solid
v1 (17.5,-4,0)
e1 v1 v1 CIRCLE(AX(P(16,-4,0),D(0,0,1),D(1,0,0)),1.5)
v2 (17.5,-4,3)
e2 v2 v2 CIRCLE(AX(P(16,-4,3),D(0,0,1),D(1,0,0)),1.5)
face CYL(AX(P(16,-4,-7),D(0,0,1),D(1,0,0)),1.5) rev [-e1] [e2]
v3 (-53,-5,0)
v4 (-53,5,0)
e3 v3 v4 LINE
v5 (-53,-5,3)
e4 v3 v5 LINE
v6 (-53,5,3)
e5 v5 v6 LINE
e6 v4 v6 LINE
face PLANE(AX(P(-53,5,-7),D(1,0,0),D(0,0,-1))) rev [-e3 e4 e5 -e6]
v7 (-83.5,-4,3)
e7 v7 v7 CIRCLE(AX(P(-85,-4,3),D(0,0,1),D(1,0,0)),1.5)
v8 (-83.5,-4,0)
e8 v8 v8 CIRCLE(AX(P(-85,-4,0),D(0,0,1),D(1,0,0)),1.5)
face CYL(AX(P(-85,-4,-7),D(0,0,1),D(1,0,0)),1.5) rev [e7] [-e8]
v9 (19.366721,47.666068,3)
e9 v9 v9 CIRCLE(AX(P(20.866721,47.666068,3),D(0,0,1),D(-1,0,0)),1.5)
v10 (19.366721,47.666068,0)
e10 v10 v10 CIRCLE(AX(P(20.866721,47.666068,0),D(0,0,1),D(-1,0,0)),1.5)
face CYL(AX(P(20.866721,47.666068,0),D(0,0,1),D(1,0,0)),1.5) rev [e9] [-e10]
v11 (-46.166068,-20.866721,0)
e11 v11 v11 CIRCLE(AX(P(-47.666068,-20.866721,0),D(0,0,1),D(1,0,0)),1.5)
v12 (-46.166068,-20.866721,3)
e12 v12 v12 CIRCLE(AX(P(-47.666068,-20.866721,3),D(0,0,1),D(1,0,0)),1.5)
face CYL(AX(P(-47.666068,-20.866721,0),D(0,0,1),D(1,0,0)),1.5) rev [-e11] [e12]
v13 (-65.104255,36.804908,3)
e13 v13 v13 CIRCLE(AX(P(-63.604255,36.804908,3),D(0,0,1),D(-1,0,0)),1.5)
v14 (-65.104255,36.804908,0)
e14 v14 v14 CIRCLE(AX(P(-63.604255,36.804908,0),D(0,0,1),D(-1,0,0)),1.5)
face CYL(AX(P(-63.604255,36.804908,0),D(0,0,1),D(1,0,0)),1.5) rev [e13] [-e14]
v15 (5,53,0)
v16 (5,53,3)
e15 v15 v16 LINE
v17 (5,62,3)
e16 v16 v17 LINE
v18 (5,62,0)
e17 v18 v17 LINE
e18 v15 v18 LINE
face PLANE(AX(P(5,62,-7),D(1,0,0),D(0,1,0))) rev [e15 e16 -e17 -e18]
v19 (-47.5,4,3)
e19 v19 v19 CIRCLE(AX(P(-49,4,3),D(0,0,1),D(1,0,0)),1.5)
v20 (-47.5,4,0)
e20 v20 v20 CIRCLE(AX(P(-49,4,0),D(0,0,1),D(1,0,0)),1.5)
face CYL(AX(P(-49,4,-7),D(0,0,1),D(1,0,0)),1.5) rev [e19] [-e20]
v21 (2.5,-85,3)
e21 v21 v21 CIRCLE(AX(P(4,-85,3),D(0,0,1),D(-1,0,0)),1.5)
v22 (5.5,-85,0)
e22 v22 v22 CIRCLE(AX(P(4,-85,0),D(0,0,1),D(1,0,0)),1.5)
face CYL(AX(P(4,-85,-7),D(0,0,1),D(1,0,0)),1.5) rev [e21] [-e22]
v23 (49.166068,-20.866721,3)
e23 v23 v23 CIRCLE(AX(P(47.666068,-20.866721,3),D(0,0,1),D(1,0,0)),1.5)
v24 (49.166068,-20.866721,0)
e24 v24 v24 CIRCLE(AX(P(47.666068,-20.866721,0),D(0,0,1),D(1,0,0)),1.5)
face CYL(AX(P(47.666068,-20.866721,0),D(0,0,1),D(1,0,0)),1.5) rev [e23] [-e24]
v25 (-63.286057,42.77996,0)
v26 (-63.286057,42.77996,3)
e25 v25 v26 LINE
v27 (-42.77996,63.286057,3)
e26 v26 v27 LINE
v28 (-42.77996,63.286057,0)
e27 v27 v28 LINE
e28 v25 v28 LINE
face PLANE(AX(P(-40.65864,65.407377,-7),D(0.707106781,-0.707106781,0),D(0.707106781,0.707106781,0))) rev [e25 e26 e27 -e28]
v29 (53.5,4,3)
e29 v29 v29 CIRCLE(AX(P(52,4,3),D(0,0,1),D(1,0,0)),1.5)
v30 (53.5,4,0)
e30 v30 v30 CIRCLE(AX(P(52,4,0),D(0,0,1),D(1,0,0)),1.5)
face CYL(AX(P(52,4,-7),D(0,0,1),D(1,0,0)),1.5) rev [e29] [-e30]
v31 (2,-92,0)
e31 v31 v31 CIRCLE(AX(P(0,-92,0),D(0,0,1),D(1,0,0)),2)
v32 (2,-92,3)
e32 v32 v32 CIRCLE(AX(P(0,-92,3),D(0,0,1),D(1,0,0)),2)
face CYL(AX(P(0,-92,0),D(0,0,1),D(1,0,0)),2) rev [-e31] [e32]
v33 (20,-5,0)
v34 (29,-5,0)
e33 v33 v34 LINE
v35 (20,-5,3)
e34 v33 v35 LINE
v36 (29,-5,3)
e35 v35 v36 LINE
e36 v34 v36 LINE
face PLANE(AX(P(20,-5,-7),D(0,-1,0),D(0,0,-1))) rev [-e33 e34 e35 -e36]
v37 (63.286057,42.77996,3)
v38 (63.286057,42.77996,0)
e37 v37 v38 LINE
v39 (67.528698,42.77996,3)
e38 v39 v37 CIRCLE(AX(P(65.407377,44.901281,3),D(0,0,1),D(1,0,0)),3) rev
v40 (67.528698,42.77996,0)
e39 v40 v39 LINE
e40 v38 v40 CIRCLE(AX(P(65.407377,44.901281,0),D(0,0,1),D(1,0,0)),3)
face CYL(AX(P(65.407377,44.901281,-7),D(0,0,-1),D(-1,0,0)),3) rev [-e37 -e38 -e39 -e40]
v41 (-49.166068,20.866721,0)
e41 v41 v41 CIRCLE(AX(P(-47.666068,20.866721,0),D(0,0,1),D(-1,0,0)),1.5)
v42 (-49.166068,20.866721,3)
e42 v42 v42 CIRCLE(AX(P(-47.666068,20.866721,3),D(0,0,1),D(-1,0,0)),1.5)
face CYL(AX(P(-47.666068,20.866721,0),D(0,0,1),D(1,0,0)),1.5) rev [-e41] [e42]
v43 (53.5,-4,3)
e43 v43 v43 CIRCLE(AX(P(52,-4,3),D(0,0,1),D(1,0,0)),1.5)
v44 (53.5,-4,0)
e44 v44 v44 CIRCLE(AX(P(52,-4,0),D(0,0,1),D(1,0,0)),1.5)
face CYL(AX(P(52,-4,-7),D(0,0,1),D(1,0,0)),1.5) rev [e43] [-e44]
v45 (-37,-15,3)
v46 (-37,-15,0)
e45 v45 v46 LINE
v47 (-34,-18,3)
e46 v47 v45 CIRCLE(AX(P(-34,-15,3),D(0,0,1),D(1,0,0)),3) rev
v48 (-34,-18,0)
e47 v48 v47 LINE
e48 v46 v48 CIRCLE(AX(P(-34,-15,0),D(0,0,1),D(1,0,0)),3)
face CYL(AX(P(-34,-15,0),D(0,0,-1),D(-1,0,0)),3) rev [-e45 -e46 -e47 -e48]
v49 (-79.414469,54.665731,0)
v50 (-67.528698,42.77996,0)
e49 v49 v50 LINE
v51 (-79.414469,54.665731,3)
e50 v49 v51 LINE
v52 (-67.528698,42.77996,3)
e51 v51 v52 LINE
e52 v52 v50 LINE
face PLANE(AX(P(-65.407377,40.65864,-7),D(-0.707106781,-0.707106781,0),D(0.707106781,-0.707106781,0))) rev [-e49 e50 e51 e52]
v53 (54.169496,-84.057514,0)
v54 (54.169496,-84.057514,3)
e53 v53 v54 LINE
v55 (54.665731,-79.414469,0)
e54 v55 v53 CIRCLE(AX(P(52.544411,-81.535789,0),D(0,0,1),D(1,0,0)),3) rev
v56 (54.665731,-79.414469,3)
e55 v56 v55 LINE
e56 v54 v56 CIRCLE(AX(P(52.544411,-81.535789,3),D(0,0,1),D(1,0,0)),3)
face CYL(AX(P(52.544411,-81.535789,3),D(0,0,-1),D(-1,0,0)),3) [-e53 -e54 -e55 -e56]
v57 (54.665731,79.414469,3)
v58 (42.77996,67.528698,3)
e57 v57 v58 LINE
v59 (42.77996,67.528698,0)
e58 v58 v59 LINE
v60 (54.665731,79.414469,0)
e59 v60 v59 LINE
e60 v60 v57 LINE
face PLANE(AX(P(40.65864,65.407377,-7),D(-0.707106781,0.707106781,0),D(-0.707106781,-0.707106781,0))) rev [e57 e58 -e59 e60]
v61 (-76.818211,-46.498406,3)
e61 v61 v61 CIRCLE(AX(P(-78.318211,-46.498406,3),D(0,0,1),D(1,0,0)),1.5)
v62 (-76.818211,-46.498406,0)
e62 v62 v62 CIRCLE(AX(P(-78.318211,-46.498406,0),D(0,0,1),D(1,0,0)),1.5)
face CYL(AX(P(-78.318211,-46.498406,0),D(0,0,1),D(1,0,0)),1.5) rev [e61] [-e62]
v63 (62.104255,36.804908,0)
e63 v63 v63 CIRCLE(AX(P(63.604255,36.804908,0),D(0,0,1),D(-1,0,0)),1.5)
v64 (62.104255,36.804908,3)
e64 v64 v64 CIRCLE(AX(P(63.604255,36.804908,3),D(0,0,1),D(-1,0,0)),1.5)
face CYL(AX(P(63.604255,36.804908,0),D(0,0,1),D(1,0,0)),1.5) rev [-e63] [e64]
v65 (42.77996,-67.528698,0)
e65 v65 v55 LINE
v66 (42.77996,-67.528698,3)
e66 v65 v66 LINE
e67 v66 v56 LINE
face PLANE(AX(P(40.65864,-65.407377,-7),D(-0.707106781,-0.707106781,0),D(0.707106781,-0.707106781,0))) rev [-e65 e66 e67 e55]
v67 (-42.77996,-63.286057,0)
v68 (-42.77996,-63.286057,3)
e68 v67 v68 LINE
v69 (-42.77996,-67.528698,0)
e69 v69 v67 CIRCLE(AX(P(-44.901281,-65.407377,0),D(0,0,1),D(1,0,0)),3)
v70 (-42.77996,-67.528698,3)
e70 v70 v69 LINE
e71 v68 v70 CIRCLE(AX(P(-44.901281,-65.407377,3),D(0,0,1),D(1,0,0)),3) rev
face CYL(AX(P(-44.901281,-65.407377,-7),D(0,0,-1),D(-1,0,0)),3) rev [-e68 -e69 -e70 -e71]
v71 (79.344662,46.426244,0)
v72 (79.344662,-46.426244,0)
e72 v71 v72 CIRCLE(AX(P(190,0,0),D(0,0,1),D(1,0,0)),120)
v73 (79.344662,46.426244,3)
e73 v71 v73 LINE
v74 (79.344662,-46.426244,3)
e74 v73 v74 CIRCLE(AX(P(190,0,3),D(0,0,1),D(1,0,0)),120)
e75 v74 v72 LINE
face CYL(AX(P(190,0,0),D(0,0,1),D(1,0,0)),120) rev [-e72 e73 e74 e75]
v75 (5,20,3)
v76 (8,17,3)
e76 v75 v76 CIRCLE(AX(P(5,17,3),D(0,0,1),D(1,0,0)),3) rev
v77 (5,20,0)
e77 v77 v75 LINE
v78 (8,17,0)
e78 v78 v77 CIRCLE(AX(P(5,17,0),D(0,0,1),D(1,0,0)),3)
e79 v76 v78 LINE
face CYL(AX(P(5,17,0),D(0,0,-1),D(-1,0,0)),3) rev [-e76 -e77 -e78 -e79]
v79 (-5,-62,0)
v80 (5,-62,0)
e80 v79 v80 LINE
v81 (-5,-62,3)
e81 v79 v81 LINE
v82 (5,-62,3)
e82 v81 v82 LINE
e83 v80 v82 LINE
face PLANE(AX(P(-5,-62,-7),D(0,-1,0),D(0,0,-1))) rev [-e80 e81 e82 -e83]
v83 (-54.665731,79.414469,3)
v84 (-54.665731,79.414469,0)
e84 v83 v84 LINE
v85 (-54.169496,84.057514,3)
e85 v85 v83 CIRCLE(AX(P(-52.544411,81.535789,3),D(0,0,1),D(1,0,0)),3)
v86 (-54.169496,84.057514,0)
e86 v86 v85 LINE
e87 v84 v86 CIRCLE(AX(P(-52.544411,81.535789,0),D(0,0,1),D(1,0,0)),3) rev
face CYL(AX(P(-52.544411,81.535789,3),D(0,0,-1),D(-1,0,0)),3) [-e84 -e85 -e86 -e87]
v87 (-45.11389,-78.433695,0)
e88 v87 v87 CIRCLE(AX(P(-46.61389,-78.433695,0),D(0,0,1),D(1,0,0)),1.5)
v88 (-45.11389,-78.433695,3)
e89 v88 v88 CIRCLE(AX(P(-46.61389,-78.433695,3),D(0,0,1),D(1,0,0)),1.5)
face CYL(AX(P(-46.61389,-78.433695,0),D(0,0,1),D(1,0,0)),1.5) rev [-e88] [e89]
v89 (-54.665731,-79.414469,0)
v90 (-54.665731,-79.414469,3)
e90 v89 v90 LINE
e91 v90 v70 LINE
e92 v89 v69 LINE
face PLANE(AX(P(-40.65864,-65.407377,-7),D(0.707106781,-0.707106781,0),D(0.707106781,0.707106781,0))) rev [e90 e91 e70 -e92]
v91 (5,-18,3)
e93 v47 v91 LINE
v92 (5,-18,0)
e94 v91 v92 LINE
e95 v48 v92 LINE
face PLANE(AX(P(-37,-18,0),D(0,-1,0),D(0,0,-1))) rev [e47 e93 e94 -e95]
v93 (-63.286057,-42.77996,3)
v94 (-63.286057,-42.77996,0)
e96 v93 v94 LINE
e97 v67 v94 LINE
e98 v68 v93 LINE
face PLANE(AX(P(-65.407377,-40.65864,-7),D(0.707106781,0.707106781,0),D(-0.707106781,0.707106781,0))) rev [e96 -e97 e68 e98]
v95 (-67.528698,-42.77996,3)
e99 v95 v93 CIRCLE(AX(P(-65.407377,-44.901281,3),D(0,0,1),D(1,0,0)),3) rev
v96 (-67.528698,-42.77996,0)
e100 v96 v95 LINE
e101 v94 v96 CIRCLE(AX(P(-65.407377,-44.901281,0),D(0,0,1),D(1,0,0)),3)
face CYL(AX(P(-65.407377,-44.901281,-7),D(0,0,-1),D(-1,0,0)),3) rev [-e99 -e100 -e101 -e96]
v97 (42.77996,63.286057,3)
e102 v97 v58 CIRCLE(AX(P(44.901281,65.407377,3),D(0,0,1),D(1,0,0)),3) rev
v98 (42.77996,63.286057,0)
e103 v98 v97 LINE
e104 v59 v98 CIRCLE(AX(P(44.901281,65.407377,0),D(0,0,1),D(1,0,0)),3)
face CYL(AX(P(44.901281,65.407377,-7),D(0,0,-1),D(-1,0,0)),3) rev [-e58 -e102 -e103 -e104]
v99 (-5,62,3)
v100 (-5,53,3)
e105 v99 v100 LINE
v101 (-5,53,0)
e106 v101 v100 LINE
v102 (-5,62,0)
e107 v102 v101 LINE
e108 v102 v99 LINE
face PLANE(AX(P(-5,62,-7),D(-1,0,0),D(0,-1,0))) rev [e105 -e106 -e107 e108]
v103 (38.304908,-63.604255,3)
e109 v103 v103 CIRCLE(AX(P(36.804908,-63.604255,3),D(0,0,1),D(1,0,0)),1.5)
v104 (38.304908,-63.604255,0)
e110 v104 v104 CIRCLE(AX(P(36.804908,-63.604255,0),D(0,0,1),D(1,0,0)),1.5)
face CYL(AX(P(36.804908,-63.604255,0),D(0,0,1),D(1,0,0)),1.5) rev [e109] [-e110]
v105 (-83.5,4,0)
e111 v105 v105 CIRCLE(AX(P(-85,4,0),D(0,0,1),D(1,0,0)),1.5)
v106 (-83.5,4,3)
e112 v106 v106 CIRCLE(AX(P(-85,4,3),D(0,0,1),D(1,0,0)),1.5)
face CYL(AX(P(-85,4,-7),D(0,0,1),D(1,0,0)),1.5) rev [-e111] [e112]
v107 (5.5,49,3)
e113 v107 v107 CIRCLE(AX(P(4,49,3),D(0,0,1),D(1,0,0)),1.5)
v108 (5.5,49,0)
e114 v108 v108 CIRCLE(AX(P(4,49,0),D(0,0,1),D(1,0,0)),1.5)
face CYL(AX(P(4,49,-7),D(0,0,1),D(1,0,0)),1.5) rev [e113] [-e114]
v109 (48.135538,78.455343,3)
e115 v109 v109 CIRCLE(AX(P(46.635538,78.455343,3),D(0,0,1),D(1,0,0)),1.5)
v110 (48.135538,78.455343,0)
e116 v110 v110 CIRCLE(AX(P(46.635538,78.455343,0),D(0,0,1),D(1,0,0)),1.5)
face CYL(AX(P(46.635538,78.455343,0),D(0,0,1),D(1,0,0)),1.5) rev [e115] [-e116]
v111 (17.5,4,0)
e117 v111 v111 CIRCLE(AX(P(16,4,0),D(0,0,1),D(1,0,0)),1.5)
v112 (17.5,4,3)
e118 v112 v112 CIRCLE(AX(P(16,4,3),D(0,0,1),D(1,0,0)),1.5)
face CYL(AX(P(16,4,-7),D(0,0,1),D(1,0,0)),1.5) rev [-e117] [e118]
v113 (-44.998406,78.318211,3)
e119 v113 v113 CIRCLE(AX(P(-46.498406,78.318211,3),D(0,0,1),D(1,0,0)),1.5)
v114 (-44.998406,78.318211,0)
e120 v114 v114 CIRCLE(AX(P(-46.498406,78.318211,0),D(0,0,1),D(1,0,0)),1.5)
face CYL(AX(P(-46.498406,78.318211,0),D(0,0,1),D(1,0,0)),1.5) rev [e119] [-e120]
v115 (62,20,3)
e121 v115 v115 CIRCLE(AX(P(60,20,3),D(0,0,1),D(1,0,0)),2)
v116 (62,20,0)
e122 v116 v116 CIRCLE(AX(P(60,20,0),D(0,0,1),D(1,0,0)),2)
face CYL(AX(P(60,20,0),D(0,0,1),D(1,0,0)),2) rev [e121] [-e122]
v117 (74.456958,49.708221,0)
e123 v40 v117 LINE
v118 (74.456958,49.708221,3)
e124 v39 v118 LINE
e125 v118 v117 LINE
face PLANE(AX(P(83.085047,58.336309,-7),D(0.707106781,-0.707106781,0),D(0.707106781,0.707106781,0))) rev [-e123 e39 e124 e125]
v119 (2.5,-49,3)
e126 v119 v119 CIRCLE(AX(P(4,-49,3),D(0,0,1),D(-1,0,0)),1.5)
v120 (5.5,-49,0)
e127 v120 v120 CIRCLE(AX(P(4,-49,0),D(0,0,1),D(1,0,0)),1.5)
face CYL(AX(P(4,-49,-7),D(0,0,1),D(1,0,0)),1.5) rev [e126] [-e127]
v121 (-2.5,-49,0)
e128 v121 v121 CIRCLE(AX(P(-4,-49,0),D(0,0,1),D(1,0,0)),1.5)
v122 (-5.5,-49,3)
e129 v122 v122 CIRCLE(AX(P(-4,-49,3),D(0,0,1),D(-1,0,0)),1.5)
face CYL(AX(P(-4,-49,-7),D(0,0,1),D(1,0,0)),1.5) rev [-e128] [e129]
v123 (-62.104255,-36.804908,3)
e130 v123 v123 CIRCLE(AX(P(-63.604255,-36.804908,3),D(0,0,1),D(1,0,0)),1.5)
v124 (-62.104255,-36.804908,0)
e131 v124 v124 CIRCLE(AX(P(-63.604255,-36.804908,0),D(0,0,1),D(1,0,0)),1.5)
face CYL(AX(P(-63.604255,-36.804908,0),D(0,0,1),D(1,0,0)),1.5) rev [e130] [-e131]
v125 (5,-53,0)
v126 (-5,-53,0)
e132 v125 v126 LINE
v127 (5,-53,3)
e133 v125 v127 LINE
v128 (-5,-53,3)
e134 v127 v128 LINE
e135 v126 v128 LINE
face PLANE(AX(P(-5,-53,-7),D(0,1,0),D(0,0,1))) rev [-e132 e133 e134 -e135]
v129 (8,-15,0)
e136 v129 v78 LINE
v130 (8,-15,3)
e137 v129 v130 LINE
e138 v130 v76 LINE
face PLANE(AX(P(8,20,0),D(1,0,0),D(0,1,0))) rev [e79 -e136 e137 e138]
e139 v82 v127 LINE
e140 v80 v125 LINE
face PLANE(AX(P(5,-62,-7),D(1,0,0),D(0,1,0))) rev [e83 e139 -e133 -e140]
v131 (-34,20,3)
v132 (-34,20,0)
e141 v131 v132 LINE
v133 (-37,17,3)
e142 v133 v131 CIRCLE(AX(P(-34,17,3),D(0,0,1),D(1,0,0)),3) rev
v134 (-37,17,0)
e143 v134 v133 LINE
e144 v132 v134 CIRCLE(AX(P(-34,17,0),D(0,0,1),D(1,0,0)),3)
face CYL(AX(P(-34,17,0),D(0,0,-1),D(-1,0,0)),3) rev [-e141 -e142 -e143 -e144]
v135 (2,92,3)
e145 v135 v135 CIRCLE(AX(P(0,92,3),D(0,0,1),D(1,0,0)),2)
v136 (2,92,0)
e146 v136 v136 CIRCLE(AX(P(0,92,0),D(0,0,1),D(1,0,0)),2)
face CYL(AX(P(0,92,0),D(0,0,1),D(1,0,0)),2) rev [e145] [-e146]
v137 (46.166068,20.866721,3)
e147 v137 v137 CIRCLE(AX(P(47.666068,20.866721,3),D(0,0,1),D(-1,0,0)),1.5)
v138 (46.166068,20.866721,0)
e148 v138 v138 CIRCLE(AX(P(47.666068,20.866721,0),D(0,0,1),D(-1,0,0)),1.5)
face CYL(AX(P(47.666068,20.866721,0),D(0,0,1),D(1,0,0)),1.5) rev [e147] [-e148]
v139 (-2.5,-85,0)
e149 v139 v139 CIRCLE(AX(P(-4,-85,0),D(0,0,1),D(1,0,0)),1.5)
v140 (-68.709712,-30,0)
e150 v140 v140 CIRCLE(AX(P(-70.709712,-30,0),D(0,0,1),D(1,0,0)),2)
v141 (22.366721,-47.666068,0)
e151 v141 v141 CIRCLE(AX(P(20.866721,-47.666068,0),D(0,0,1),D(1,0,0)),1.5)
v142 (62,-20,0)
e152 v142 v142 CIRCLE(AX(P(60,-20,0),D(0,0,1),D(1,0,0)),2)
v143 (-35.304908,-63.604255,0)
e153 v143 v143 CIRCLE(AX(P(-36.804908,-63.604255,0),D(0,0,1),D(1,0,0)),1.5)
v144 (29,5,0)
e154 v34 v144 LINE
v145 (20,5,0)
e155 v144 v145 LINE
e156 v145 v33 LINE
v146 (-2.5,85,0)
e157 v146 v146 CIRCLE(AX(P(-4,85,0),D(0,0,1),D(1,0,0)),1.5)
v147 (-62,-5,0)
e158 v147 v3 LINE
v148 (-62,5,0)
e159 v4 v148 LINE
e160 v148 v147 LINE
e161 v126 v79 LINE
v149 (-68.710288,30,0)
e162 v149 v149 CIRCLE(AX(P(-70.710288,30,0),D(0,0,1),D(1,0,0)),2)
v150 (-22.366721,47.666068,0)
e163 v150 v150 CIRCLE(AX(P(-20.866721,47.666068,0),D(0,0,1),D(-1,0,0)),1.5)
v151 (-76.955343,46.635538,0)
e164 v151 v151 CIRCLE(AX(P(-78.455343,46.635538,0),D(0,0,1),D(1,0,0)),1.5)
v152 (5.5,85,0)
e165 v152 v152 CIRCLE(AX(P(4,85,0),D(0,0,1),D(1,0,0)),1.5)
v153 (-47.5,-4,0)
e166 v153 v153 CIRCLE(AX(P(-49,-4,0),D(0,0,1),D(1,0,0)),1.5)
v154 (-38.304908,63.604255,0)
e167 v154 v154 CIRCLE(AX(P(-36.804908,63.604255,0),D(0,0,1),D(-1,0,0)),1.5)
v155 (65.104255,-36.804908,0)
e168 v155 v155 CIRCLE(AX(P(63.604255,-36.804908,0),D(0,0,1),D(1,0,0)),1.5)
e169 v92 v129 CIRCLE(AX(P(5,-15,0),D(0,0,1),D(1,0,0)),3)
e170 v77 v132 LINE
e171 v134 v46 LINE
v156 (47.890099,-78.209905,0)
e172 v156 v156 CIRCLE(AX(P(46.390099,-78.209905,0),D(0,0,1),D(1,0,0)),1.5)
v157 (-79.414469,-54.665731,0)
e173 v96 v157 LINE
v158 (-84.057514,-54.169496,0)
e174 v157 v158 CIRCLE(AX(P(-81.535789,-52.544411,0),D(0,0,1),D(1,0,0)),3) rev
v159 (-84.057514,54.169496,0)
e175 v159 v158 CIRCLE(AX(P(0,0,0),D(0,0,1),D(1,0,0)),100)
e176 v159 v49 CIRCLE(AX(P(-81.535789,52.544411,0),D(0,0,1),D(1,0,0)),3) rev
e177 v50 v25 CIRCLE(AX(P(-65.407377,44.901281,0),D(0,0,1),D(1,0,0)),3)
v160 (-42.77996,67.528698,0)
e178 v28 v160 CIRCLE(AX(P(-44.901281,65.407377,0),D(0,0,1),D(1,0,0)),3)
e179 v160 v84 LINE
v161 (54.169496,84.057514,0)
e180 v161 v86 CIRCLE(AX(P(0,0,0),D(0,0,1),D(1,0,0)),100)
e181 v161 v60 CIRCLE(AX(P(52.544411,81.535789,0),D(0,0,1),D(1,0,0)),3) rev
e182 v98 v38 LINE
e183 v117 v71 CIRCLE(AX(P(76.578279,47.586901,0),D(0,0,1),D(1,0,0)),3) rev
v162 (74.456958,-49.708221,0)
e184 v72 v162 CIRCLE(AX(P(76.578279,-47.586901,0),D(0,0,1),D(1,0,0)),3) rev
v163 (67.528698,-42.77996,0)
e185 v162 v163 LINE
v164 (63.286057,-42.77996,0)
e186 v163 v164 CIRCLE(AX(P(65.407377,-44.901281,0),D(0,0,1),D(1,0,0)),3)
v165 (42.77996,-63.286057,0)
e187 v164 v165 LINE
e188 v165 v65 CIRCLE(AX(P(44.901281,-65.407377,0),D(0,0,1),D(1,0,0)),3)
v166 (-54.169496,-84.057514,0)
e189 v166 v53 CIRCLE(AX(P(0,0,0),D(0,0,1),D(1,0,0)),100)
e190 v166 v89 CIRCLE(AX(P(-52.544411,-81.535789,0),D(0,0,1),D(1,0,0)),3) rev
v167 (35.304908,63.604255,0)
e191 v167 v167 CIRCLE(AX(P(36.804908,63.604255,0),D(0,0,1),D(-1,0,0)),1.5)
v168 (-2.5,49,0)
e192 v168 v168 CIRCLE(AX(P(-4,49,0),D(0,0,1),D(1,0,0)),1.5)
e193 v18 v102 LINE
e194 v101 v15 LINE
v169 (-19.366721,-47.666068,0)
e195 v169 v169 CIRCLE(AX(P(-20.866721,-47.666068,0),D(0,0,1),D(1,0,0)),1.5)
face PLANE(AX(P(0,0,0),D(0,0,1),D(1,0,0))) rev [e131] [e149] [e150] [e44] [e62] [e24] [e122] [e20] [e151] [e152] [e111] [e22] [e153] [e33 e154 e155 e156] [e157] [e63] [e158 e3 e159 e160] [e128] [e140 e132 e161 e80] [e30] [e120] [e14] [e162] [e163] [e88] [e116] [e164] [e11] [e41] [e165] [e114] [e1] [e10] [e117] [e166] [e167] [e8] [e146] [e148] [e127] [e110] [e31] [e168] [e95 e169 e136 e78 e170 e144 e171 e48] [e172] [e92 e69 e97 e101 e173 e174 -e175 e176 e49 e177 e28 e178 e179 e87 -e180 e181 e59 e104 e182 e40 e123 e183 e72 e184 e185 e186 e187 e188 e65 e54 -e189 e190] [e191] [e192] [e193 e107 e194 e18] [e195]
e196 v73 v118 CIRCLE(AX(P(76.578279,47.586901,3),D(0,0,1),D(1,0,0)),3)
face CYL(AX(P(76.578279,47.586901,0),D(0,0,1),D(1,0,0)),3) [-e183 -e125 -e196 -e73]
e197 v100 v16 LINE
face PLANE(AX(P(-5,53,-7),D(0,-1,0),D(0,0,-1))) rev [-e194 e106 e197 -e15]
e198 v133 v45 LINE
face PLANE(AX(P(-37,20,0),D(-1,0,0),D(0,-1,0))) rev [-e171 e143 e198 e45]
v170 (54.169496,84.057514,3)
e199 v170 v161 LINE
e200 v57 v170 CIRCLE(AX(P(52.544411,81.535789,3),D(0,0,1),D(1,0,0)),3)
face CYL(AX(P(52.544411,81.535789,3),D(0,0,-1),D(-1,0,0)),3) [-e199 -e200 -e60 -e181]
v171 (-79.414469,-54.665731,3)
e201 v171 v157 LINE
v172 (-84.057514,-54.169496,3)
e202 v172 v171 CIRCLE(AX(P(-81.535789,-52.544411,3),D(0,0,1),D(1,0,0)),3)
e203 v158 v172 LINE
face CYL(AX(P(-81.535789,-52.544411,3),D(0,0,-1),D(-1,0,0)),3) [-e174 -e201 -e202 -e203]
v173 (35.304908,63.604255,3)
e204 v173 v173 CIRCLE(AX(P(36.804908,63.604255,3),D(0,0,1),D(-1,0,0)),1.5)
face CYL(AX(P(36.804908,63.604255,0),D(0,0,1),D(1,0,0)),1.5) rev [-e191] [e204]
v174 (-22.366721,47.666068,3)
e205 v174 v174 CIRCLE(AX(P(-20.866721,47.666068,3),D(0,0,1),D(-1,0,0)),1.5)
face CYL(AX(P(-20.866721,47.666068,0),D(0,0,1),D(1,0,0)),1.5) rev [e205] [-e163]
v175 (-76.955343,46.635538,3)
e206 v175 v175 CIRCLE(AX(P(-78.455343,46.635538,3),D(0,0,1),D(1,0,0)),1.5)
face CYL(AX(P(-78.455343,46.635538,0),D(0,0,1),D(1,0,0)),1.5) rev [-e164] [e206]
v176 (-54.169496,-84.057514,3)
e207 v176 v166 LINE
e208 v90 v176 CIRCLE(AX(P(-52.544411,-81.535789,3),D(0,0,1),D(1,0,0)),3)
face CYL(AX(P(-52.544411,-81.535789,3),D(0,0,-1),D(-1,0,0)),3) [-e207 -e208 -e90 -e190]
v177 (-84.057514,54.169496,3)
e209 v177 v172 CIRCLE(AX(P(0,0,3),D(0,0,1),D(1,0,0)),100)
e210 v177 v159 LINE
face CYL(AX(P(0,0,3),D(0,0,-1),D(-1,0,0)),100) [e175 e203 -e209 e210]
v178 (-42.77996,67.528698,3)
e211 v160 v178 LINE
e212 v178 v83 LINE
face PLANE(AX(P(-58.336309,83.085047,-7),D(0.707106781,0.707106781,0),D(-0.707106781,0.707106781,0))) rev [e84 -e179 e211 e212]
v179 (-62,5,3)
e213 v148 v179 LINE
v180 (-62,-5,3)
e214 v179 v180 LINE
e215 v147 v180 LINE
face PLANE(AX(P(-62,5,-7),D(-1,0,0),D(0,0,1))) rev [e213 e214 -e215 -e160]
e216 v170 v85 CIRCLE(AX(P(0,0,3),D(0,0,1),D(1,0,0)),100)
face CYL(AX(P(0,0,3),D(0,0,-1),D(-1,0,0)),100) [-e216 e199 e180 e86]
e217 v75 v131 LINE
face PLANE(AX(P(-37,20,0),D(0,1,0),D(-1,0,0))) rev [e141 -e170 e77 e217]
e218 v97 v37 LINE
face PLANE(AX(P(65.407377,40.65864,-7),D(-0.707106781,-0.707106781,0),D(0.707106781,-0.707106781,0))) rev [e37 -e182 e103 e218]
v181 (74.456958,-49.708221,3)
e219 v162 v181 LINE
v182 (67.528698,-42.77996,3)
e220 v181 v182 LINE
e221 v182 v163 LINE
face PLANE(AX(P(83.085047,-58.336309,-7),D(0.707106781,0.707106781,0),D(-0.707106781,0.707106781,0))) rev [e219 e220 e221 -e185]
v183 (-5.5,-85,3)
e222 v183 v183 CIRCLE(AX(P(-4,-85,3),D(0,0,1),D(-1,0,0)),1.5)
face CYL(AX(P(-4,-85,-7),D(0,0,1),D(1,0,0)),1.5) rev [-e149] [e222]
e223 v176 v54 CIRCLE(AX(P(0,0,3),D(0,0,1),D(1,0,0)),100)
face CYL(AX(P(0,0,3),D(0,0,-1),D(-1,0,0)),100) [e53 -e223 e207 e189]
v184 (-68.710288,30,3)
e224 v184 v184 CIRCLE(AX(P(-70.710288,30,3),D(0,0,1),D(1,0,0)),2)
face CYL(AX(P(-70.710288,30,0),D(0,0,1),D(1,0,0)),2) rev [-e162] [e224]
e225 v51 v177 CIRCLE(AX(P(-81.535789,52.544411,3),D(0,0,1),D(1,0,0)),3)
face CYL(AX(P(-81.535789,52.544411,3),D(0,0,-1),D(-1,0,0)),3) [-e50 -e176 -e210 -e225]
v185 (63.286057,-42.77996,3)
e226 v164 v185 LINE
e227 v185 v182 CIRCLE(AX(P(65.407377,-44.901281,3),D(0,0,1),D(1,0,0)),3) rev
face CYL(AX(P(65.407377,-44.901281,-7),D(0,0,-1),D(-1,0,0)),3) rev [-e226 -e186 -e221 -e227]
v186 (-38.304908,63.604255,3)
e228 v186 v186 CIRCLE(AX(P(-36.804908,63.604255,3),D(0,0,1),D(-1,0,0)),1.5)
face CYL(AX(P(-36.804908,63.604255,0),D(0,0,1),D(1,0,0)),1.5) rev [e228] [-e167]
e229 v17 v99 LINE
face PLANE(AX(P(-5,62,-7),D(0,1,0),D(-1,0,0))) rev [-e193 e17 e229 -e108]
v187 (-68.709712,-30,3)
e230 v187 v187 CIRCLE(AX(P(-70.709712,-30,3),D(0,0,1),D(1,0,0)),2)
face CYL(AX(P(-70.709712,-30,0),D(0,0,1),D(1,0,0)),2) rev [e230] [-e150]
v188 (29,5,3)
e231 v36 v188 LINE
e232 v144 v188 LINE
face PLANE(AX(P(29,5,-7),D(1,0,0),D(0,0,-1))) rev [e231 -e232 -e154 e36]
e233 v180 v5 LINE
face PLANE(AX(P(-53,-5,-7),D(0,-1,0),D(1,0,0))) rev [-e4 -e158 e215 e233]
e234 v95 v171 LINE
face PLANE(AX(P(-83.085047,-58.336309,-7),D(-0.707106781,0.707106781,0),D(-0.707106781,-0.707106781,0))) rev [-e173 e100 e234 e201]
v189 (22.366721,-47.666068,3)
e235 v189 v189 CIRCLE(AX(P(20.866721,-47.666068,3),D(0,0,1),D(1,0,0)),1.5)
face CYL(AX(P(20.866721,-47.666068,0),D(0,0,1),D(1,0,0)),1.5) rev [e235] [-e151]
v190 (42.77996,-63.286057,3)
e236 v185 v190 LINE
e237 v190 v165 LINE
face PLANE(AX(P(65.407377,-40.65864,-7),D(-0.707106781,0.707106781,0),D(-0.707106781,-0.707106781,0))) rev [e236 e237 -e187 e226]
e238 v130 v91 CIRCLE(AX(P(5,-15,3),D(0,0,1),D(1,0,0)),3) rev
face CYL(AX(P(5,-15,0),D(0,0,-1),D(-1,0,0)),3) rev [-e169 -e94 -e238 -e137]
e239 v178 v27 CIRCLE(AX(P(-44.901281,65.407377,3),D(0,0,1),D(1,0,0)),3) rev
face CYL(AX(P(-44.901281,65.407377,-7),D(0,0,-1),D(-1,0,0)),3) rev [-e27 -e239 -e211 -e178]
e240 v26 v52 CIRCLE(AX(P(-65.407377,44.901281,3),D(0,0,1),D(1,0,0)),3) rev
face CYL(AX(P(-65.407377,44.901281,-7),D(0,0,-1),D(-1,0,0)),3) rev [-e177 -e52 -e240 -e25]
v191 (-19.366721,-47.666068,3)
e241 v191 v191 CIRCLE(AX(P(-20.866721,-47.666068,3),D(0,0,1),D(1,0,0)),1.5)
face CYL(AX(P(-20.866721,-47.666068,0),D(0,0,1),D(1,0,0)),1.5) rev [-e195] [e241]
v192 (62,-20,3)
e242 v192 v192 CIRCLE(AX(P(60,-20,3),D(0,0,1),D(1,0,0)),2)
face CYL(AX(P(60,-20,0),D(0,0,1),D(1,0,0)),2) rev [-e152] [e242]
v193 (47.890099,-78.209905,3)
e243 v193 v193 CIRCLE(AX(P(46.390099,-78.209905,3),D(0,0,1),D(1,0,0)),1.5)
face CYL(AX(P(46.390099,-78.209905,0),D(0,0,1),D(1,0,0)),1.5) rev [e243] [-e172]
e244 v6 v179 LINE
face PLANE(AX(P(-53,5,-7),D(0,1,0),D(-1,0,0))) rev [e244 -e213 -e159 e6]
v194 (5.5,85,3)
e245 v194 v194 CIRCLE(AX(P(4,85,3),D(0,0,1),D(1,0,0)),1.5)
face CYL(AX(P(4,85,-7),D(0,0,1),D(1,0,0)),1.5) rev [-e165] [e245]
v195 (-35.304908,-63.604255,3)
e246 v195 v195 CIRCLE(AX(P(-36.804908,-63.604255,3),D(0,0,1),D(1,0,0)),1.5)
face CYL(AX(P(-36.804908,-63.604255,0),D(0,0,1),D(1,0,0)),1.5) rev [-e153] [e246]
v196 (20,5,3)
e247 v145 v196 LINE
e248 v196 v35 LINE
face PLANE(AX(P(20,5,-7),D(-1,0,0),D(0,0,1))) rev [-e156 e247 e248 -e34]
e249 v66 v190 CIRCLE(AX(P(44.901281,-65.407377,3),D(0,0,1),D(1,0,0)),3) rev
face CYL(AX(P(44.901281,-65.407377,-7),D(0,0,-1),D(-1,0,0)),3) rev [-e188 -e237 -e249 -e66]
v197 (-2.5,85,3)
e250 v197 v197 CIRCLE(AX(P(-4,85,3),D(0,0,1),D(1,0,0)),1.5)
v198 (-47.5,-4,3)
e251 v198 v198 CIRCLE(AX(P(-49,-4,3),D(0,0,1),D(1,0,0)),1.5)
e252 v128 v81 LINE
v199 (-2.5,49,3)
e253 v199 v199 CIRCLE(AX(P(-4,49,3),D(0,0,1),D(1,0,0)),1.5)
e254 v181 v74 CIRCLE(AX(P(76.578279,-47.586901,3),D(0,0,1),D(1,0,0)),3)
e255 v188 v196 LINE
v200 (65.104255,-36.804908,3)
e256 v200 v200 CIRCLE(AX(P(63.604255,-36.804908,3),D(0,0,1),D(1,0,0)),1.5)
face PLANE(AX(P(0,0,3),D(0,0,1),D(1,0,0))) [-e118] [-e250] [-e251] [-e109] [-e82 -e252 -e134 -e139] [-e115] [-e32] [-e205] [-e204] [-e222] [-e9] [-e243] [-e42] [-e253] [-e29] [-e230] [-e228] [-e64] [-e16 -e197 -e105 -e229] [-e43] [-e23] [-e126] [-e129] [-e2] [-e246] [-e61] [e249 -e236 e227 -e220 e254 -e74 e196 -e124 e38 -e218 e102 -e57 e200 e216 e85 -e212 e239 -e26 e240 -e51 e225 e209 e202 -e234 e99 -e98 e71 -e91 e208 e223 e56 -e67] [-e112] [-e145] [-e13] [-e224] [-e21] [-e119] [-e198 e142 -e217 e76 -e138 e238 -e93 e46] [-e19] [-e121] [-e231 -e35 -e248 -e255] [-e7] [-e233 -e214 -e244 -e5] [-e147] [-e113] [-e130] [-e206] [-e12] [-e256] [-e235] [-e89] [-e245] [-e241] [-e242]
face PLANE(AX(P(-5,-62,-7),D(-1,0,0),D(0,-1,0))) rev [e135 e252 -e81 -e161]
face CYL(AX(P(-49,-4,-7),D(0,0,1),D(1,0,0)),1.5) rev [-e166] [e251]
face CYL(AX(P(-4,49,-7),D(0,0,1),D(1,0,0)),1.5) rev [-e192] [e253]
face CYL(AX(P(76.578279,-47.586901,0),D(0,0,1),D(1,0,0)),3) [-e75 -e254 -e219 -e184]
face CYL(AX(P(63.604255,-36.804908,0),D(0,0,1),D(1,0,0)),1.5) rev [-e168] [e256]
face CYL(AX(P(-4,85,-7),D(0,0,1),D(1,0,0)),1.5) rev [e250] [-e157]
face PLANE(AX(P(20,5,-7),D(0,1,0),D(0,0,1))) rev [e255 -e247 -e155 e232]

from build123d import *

# Parameters (mm, degrees)
CROQUIS1_R              = 100
SALIENTE_EXTRUIR1_DEPTH = 3
CROQUIS3_R              = 120
CORTAR_EXTRUIR1_DEPTH   = 3
CORTAR_EXTRUIR6_DEPTH   = 10
CROQUIS12_R             = 1.5
CORTAR_EXTRUIR7_DEPTH   = 142.453172464
CROQUIS9_R              = 1.5
CROQUIS9_W              = 9
CROQUIS9_H              = 10
CROQUIS9_W_2            = 10
CROQUIS9_H_2            = 9
CORTAR_EXTRUIR5_DEPTH   = 10
CROQUIS13_R             = 2
CROQUIS13_W             = 45
CROQUIS13_H             = 38
CORTAR_EXTRUIR8_DEPTH   = 142.453172464
REDONDEO2_R             = 3
REDONDEO3_R             = 3
CROQUIS14_R             = 1.5
CORTAR_EXTRUIR9_DEPTH   = 142.453172607


with BuildPart() as part:
    # Croquis1 → Saliente-Extruir1 (new body)
    with BuildSketch(Plane.XY):
        Circle(CROQUIS1_R)
    extrude(amount=SALIENTE_EXTRUIR1_DEPTH)

    # Croquis3 → Cortar-Extruir1 (cut)
    with BuildSketch(Plane.XY.offset(3)):
        with Locations((190, 0)):
            Circle(CROQUIS3_R)
    extrude(amount=-CORTAR_EXTRUIR1_DEPTH, mode=Mode.SUBTRACT)

    # Croquis5 → Cortar-Extruir6 (cut)
    with BuildSketch(Plane.XY.offset(3)):
        Polygon((-58.336309448, -83.085046789), (-83.085046789, -58.336309448), (-65.40737726, -40.658639918), (-40.658639918, -65.40737726), align=None)
        Polygon((-83.085046789, 58.336309448), (-58.336309448, 83.085046789), (-40.658639918, 65.40737726), (-65.40737726, 40.658639918), align=None)
        Polygon((58.336309448, -83.085046789), (83.085046789, -58.336309448), (65.40737726, -40.658639918), (40.658639918, -65.40737726), align=None)
        Polygon((58.336309448, 83.085046789), (83.085046789, 58.336309448), (65.40737726, 40.658639918), (40.658639918, 65.40737726), align=None)
    extrude(amount=-CORTAR_EXTRUIR6_DEPTH, mode=Mode.SUBTRACT)

    # Croquis12 → Cortar-Extruir7 (cut, through all)
    with BuildSketch(Plane.XY.offset(3)):
        with Locations((-63.604254904, -36.804908024)):
            Circle(CROQUIS12_R)
        with Locations((-36.804907897, -63.604255031)):
            Circle(CROQUIS12_R)
        with Locations((-47.666068056, -20.866721176)):
            Circle(CROQUIS12_R)
        with Locations((-20.866721049, -47.666068183)):
            Circle(CROQUIS12_R)
        with Locations(Location((47.666068183, 20.866721049, 0), (0, 0, 180))):
            Circle(CROQUIS12_R)
        with Locations(Location((20.866721176, 47.666068056, 0), (0, 0, 180))):
            Circle(CROQUIS12_R)
        with Locations(Location((63.604255031, 36.804907897, 0), (0, 0, 180))):
            Circle(CROQUIS12_R)
        with Locations(Location((36.804908024, 63.604254904, 0), (0, 0, 180))):
            Circle(CROQUIS12_R)
        with Locations((20.866721325, -47.666067908)):
            Circle(CROQUIS12_R)
        with Locations((47.666068332, -20.866720901)):
            Circle(CROQUIS12_R)
        with Locations((63.60425518, -36.804907749)):
            Circle(CROQUIS12_R)
        with Locations((36.804908173, -63.604254756)):
            Circle(CROQUIS12_R)
        with Locations(Location((-63.604254756, 36.804908173, 0), (0, 0, 180))):
            Circle(CROQUIS12_R)
        with Locations(Location((-36.804907749, 63.60425518, 0), (0, 0, 180))):
            Circle(CROQUIS12_R)
        with Locations(Location((-20.866720901, 47.666068332, 0), (0, 0, 180))):
            Circle(CROQUIS12_R)
        with Locations(Location((-47.666067908, 20.866721325, 0), (0, 0, 180))):
            Circle(CROQUIS12_R)
    extrude(amount=-CORTAR_EXTRUIR7_DEPTH, mode=Mode.SUBTRACT)

    # Croquis9 → Cortar-Extruir5 (cut)
    with BuildSketch(Plane.XY.offset(3)):
        with Locations((52, -4)):
            Circle(CROQUIS9_R)
        with Locations((16, 4)):
            Circle(CROQUIS9_R)
        with Locations((52, 4)):
            Circle(CROQUIS9_R)
        with Locations((16, -4)):
            Circle(CROQUIS9_R)
        with Locations((-85, 4)):
            Circle(CROQUIS9_R)
        with Locations((-85, -4)):
            Circle(CROQUIS9_R)
        with Locations((-49, 4)):
            Circle(CROQUIS9_R)
        with Locations((-49, -4)):
            Circle(CROQUIS9_R)
        with Locations((-4, 85)):
            Circle(CROQUIS9_R)
        with Locations((4, 85)):
            Circle(CROQUIS9_R)
        with Locations((-4, 49)):
            Circle(CROQUIS9_R)
        with Locations((4, 49)):
            Circle(CROQUIS9_R)
        with Locations((-4, -49)):
            Circle(CROQUIS9_R)
        with Locations((4, -49)):
            Circle(CROQUIS9_R)
        with Locations((4, -85)):
            Circle(CROQUIS9_R)
        with Locations((-4, -85)):
            Circle(CROQUIS9_R)
        with Locations((24.5, 0)):
            Rectangle(CROQUIS9_W, CROQUIS9_H)
        with Locations((0, -57.5)):
            Rectangle(CROQUIS9_W_2, CROQUIS9_H_2)
        with Locations((-57.5, 0)):
            Rectangle(CROQUIS9_W, CROQUIS9_H)
        with Locations((0, 57.5)):
            Rectangle(CROQUIS9_W_2, CROQUIS9_H_2)
    extrude(amount=-CORTAR_EXTRUIR5_DEPTH, mode=Mode.SUBTRACT)

    # Croquis13 → Cortar-Extruir8 (cut, through all)
    with BuildSketch(Plane.XY.offset(3)):
        with Locations((-70.710287698, 30)):
            Circle(CROQUIS13_R)
        with Locations((-70.709712289, -30)):
            Circle(CROQUIS13_R)
        with Locations((0, -92)):
            Circle(CROQUIS13_R)
        with Locations((0, 92)):
            Circle(CROQUIS13_R)
        with Locations((60, -20)):
            Circle(CROQUIS13_R)
        with Locations((60, 20)):
            Circle(CROQUIS13_R)
        with Locations((-14.5, 1)):
            Rectangle(CROQUIS13_W, CROQUIS13_H)
    extrude(amount=-CORTAR_EXTRUIR8_DEPTH, mode=Mode.SUBTRACT)

    # Redondeo2
    # the kernel refuses this fillet: 3 mm, written as the material it adds along each edge
    with BuildSketch(Plane(origin=(-37, -18, 3), x_dir=(0, 1, 0), z_dir=(0, 0, -1)), Plane(origin=(8, 20, 3), x_dir=(0, -1, 0), z_dir=(0, 0, -1)), Plane(origin=(8, -18, 3), x_dir=(-1, 0, 0), z_dir=(0, 0, -1)), Plane(origin=(40.658639918, -65.40737726, 3), x_dir=(0.7071067811865925, 0.7071067811865025, 0), z_dir=(0, 0, -1)), Plane(origin=(65.40737726, -40.658639918, 3), x_dir=(0.7071067811865014, -0.7071067811865938, 0), z_dir=(0, 0, -1)), Plane(origin=(-40.658639918, -65.40737726, 3), x_dir=(-0.7071067811865688, -0.7071067811865261, 0), z_dir=(0, 0, -1)), Plane(origin=(-65.40737726, -40.658639918, 3), x_dir=(0.7071067811865263, -0.7071067811865689, 0), z_dir=(0, 0, -1))) as redondeo2_piece_1:
        with BuildLine():
            CenterArc((REDONDEO2_R, REDONDEO2_R), REDONDEO2_R, 180, 90)
            Line((0, REDONDEO2_R), (0, 0))
            Line((0, 0), (REDONDEO2_R, 0))
        make_face()
    extrude(amount=3)
    with BuildSketch(Plane(origin=(-37, 20, 3), x_dir=(0, -1, 0), z_dir=(0, 0, -1)), Plane(origin=(-40.658639918, 65.40737726, 3), x_dir=(-0.7071067811865013, 0.7071067811865936, 0), z_dir=(0, 0, -1)), Plane(origin=(-65.40737726, 40.658639918, 3), x_dir=(0.707106781186595, 0.7071067811865002, 0), z_dir=(0, 0, -1)), Plane(origin=(40.658639918, 65.40737726, 3), x_dir=(0.707106781186525, -0.70710678118657, 0), z_dir=(0, 0, -1)), Plane(origin=(65.40737726, 40.658639918, 3), x_dir=(0.7071067811865688, 0.7071067811865261, 0), z_dir=(0, 0, -1))) as redondeo2_piece_2:
        with BuildLine():
            CenterArc((REDONDEO2_R, -REDONDEO2_R), REDONDEO2_R, 90, 90)
            Line((0, -REDONDEO2_R), (0, 0))
            Line((0, 0), (REDONDEO2_R, 0))
        make_face()
    extrude(amount=3)
    # the kernel refuses this fillet: 3 mm, written as the material it takes off along each edge
    with BuildSketch(Plane(origin=(-81.993870249, 57.245132907, 12.259512252), x_dir=(0.7071067811864988, -0.7071067811865962, 0), z_dir=(0, 0, -1)), Plane(origin=(57.245132907, 81.993870249, 12.259512252), x_dir=(-0.707106781186567, -0.707106781186528, 0), z_dir=(0, 0, -1))) as redondeo2_2_piece_1:
        with BuildLine():
            CenterArc((3.647824779, 3), REDONDEO2_R, 167.799096685, 102.200903315)
            ThreePointArc((0.715587092, 3.634020619), (0.340967474, 1.820323587), (0, 0))
            Line((0, 0), (3.647824779, 0))
        make_face()
    extrude(amount=21.519024503, mode=Mode.SUBTRACT)
    with BuildSketch(Plane(origin=(-57.245132907, 81.993870249, 12.259512252), x_dir=(0.8303993298839993, 0.5571686934207671, 0), z_dir=(0, 0, -1))) as redondeo2_2_piece_2:
        with BuildLine():
            CenterArc((3.648247827, 2.999485524), REDONDEO2_R, 168.860219289, 102.200903315)
            Line((0.704771551, 3.579095232), (0, 0))
            ThreePointArc((0, 0), (1.85190245, -0.017149184), (3.703804901, 0))
        make_face()
    extrude(amount=21.519024503, mode=Mode.SUBTRACT)
    with BuildSketch(Plane(origin=(57.245132907, -81.993870249, 12.259512252), x_dir=(-0.7071067811864988, 0.7071067811865962, 0), z_dir=(0, 0, -1)), Plane(origin=(-81.993870249, -57.245132907, 12.259512252), x_dir=(0.707106781186568, 0.707106781186527, 0), z_dir=(0, 0, -1))) as redondeo2_2_piece_3:
        with BuildLine():
            CenterArc((3.647824779, -3), REDONDEO2_R, 90, 102.200903315)
            ThreePointArc((0.715587092, -3.634020619), (0.340967474, -1.820323587), (0, 0))
            Line((0, 0), (3.647824779, 0))
        make_face()
    extrude(amount=21.519024503, mode=Mode.SUBTRACT)
    with BuildSketch(Plane(origin=(81.993870249, -57.245132907, 11.583056929), x_dir=(0.5619940188878753, 0.8271412955077593, 0), z_dir=(0, 0, -1))) as redondeo2_2_piece_4:
        with BuildLine():
            CenterArc((3.590487142, -2.809879123), REDONDEO2_R, 110.507494251, 80.298695839)
            Line((0.643686139, -3.372341435), (0, 0))
            ThreePointArc((0, 0), (1.269748729, 0.008061634), (2.539497458, 0))
        make_face()
    extrude(amount=20.166113858, mode=Mode.SUBTRACT)
    with BuildSketch(Plane(origin=(81.993870249, 57.245132907, 11.583056929), x_dir=(0.5619940188878358, -0.827141295507786, 0), z_dir=(0, 0, -1))) as redondeo2_2_piece_5:
        with BuildLine():
            CenterArc((3.590487142, 2.809879123), REDONDEO2_R, 169.19380991, 80.298695839)
            Line((0.643686139, 3.372341435), (0, 0))
            ThreePointArc((0, 0), (1.269748729, -0.008061634), (2.539497458, 0))
        make_face()
    extrude(amount=20.166113858, mode=Mode.SUBTRACT)
    with BuildSketch(Plane(origin=(-57.245132907, -81.993870249, 12.259512252), x_dir=(0.8303993298839483, -0.5571686934208434, 0), z_dir=(0, 0, -1))) as redondeo2_2_piece_6:
        with BuildLine():
            CenterArc((3.648247827, -2.999485524), REDONDEO2_R, 88.938877397, 102.200903315)
            Line((0.704771551, -3.579095232), (0, 0))
            ThreePointArc((0, 0), (1.85190245, 0.017149184), (3.703804901, 0))
        make_face()
    extrude(amount=21.519024503, mode=Mode.SUBTRACT)

    # Redondeo3
    redondeo3_edges = [part.edges().sort_by_distance(p)[0] for p in [
        (83.421052632, -55.14460969, 1.5),
        (83.421052632, 55.14460969, 1.5),
    ]]
    fillet(redondeo3_edges, radius=REDONDEO3_R)

    # Croquis14 → Cortar-Extruir9 (cut, through all)
    with BuildSketch(Plane.XY.offset(3)):
        with Locations((46.390099465, -78.209904618)):
            Circle(CROQUIS14_R)
        with Locations((-46.613889508, -78.433694662)):
            Circle(CROQUIS14_R)
        with Locations((-78.318210918, -46.498405764)):
            Circle(CROQUIS14_R)
        with Locations((-78.455342963, 46.63553781)):
            Circle(CROQUIS14_R)
        with Locations((-46.498405821, 78.318210974)):
            Circle(CROQUIS14_R)
        with Locations((46.63553784, 78.455342993)):
            Circle(CROQUIS14_R)
    extrude(amount=-CORTAR_EXTRUIR9_DEPTH, mode=Mode.SUBTRACT)


solid = part.part
